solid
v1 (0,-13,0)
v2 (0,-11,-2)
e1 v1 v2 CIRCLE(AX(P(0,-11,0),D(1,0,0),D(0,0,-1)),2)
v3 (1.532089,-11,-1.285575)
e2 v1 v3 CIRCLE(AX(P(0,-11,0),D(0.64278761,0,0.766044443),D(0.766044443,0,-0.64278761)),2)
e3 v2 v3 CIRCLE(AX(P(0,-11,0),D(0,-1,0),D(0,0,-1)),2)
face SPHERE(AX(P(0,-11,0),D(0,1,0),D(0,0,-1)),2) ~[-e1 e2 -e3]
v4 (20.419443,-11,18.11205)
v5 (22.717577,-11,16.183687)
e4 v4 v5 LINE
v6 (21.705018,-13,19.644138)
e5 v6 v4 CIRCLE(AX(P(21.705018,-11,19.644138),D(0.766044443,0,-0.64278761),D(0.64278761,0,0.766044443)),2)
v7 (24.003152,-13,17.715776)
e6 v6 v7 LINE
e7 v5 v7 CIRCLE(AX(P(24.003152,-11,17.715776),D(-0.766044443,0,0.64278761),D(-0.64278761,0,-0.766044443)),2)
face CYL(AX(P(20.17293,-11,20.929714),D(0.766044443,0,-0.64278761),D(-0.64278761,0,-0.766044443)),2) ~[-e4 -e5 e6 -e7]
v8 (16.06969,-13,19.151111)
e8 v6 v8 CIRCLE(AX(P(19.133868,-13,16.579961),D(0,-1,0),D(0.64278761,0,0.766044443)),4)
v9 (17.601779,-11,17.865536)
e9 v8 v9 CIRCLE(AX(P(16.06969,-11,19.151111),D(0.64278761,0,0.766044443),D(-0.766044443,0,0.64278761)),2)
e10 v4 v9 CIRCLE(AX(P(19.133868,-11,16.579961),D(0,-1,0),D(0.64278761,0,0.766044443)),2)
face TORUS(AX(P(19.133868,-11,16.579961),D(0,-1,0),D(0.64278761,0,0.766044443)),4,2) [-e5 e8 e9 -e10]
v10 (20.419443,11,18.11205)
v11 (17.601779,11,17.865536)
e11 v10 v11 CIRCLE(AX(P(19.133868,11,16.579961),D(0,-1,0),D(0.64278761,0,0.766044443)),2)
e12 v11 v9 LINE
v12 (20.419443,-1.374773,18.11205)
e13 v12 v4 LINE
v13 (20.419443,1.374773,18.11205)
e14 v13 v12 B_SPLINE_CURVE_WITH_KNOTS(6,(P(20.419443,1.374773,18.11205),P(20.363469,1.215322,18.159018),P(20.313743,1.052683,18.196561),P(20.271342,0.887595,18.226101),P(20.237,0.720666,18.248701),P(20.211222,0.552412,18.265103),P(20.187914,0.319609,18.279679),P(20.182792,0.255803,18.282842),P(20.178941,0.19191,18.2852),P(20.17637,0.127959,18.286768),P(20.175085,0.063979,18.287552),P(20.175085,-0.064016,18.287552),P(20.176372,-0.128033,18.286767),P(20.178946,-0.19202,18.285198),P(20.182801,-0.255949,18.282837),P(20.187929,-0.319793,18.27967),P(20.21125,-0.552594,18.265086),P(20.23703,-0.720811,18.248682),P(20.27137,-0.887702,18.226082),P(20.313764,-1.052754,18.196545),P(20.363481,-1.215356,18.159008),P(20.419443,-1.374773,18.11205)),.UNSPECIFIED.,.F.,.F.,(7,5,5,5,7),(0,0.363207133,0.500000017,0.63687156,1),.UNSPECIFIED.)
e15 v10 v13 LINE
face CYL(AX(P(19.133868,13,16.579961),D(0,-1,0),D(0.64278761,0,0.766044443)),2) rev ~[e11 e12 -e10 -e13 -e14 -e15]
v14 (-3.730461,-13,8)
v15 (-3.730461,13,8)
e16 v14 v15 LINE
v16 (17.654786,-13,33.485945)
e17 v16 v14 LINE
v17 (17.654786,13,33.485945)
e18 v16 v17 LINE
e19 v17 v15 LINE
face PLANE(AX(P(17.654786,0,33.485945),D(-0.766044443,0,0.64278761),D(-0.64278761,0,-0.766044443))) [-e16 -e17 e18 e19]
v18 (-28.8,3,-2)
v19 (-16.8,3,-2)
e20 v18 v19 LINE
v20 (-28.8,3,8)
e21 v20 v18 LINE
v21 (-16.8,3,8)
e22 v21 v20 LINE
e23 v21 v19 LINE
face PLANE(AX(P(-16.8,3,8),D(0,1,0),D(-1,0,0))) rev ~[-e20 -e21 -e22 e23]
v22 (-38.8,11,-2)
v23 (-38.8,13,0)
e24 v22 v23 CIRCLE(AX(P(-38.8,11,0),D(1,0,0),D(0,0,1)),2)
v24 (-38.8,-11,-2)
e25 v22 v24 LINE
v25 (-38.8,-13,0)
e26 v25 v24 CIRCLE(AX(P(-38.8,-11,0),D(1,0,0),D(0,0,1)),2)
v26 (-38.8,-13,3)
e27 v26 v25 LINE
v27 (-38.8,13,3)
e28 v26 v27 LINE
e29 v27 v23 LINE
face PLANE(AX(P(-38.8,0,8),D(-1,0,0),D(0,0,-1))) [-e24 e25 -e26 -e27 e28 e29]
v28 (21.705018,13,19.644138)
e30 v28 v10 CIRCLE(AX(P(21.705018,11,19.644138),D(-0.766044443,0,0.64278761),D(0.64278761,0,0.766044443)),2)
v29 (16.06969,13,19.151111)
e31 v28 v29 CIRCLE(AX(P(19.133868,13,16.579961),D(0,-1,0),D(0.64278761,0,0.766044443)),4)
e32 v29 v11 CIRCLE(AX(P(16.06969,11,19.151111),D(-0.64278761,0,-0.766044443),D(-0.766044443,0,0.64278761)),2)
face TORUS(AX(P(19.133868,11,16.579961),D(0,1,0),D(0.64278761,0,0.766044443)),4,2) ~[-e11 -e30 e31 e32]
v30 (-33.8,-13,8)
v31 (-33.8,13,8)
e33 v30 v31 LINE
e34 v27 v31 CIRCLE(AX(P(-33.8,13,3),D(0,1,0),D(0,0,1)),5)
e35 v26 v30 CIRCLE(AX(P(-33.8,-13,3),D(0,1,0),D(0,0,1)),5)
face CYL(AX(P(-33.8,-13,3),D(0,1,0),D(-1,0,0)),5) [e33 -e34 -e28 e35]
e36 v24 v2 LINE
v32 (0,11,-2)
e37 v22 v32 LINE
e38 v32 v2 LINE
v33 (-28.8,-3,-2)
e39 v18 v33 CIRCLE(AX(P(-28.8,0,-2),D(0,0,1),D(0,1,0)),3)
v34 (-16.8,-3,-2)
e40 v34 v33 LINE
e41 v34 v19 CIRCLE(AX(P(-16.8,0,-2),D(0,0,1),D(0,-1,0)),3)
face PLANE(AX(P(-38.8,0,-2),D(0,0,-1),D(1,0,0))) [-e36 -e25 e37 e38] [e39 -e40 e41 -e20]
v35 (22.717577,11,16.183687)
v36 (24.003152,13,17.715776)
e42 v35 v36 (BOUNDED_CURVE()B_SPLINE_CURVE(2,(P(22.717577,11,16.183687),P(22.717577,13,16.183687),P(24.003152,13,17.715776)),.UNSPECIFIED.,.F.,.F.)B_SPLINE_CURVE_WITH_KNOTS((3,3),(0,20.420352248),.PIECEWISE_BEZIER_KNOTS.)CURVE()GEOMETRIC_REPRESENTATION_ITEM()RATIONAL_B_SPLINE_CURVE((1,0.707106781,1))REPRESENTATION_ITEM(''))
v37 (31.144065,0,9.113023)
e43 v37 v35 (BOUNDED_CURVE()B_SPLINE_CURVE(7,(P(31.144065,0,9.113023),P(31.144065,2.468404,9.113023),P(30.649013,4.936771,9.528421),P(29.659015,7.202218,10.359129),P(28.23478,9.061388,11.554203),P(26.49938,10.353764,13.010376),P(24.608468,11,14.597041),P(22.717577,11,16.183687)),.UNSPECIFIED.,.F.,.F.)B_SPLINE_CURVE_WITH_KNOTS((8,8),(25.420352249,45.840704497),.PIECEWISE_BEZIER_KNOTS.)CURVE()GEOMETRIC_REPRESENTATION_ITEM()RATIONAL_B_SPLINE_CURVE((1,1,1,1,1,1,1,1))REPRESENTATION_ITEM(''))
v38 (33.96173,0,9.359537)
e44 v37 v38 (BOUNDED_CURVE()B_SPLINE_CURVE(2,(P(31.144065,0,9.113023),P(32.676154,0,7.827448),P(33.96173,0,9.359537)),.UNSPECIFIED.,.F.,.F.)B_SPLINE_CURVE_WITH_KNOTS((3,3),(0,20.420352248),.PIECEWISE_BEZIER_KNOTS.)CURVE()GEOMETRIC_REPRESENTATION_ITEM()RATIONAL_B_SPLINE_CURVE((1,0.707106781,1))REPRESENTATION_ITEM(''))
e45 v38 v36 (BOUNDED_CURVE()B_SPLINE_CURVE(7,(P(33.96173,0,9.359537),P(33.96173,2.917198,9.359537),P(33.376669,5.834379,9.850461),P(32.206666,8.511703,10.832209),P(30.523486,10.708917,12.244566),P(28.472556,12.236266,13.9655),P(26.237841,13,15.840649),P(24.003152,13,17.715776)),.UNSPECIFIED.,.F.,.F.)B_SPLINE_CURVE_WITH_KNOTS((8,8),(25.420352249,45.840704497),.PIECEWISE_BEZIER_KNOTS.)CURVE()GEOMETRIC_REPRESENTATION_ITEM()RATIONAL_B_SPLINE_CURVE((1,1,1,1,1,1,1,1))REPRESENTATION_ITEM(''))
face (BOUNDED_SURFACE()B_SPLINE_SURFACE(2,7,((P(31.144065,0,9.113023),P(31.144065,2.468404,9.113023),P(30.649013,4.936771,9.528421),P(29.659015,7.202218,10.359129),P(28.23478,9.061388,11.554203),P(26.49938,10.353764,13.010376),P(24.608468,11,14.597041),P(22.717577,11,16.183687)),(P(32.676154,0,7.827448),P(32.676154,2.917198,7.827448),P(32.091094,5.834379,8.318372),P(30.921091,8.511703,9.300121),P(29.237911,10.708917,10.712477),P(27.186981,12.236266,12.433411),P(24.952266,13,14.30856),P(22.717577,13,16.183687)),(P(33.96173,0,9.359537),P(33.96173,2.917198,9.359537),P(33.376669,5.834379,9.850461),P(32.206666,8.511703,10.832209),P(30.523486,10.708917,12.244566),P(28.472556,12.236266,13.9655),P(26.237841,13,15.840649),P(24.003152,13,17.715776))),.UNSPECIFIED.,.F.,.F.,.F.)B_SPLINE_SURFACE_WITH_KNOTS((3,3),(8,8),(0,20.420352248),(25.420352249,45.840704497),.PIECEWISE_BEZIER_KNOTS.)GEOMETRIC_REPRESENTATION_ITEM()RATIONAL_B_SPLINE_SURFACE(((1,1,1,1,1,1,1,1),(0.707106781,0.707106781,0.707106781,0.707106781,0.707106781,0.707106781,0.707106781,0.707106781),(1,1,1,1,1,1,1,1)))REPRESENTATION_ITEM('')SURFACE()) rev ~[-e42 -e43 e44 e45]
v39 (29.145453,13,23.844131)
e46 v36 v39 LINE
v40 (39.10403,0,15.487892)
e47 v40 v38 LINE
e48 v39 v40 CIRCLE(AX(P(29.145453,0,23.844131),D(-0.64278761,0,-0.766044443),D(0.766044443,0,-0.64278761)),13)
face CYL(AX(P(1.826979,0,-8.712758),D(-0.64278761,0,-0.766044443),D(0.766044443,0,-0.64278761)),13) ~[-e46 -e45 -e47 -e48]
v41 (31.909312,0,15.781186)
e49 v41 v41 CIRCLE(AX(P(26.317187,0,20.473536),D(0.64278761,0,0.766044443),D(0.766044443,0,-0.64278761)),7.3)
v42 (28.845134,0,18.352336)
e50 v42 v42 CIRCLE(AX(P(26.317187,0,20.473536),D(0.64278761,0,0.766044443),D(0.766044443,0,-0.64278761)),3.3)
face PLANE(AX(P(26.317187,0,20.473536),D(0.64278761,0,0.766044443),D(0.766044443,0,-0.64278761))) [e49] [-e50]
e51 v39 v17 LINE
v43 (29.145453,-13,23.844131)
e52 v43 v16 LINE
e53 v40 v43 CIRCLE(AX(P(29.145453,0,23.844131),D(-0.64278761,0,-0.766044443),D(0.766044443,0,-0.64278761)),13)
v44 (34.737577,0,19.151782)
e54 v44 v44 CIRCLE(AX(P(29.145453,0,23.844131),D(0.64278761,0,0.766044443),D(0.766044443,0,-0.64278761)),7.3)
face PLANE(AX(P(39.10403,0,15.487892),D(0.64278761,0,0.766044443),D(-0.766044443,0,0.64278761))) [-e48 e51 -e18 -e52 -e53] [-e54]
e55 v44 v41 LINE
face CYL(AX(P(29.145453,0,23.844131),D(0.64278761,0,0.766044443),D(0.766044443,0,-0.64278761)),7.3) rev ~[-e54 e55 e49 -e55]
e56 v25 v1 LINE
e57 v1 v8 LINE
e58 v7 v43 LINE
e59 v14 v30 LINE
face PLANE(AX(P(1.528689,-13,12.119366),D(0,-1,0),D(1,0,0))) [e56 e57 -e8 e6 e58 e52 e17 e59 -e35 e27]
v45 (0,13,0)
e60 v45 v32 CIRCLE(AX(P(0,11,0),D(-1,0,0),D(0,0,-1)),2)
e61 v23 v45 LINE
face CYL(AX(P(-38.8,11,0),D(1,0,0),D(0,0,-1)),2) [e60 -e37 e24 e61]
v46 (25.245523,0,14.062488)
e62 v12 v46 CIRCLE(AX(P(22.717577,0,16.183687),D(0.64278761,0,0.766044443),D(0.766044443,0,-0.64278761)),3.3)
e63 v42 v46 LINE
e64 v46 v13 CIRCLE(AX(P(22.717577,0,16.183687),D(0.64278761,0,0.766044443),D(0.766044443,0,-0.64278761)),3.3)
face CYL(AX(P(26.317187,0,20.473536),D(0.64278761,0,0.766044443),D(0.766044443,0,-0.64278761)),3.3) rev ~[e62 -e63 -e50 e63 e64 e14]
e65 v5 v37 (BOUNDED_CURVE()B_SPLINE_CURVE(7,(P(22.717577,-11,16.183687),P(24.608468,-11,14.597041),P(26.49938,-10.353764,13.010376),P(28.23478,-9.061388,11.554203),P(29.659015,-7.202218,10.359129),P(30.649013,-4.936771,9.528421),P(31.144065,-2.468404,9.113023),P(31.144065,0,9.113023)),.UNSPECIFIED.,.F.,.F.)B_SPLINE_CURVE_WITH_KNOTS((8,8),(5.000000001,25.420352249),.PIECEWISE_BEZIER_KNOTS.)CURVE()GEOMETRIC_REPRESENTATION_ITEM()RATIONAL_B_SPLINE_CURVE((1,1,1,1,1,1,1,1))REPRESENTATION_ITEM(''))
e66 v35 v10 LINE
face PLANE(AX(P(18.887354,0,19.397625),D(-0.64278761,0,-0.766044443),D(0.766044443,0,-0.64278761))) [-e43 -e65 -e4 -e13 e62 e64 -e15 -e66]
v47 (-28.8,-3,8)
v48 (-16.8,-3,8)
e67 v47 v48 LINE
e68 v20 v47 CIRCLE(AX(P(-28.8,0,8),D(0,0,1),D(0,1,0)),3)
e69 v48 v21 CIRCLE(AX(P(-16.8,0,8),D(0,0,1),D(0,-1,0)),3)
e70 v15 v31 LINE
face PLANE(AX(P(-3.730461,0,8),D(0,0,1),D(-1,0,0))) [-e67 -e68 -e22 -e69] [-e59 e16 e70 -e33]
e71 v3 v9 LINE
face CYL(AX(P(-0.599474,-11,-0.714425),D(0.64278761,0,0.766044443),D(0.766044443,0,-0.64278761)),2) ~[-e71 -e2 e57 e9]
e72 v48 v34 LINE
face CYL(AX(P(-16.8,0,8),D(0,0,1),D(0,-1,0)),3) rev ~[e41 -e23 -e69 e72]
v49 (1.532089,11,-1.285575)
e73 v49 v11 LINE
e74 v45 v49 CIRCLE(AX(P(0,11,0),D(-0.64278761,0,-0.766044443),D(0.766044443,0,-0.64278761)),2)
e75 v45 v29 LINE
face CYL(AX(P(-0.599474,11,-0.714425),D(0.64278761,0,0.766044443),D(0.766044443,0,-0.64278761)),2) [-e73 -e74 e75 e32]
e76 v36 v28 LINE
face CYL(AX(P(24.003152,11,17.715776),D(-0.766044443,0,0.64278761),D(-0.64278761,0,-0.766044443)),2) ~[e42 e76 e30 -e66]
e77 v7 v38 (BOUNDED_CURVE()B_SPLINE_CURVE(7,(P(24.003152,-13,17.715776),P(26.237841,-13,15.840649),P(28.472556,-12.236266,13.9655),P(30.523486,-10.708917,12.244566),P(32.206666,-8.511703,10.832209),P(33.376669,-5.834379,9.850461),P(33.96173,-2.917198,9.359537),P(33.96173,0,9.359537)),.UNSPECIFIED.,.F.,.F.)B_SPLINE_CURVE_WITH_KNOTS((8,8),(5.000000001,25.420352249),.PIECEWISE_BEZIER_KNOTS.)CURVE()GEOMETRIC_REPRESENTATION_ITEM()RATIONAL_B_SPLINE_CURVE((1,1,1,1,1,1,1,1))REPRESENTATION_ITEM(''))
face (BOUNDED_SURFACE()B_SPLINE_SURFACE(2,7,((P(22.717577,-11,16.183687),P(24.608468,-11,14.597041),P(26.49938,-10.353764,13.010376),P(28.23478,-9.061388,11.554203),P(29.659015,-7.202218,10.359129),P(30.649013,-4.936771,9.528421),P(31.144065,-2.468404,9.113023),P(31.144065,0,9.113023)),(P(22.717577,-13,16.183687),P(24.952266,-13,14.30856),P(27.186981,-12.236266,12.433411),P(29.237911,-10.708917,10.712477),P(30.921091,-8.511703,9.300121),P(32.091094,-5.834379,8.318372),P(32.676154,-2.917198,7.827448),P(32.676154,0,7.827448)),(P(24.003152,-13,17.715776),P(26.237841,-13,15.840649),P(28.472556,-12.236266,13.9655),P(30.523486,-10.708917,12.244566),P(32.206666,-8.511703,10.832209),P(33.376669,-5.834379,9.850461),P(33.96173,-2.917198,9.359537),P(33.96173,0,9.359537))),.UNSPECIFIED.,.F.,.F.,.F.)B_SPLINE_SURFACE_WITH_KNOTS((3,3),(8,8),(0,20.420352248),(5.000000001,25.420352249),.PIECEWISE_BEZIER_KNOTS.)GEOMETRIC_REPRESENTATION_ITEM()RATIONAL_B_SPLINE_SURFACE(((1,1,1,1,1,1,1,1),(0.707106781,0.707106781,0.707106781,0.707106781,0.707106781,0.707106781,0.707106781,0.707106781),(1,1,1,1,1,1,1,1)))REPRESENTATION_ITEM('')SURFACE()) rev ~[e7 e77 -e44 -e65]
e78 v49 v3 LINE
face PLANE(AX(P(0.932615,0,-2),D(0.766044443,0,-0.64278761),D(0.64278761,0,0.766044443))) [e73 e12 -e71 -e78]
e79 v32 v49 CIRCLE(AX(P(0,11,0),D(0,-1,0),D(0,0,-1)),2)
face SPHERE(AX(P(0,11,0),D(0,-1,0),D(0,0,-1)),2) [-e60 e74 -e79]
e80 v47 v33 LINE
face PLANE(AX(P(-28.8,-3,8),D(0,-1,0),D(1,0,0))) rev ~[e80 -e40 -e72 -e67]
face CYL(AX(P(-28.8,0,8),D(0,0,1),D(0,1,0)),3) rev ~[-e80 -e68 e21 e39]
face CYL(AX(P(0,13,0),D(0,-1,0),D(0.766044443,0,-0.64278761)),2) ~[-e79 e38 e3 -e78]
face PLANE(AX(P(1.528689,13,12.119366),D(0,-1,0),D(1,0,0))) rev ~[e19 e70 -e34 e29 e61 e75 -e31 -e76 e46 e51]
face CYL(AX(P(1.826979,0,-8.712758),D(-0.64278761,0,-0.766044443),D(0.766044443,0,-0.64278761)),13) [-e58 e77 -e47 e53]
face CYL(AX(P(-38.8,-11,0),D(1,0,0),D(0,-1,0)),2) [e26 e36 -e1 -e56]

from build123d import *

# Parameters (mm, degrees)
F1_DEPTH    = 13
F2_T1_DEPTH = 75
F3_R        = 2
F4_R        = 7.3
F5_DEPTH    = 4.4
F6_R        = 3.3
F7_DEPTH    = 59.0732481421
F9_DEPTH    = 10.001
F10_R       = 5


# Not quite as in the source:
# - a fillet or chamfer that OpenCascade refuses, or shapes differently, is made with other operations: its cross-section is extruded or revolved along the edge and cut away or added


with BuildPart() as f1:
    # F0 (on Front) → F1 (new body, symmetric)
    with BuildSketch(Plane.XZ):
        Polygon((-38.8, 8), (-38.8, 0), (0, 0), (18.6408406809, 22.2152888505), (33.9617295433, 9.3595366567), (39.1040304208, 15.4878922017), (17.6547860135, 33.4859452729), (-3.7304612652, 8), align=None)
        Polygon((0, 0), (-38.8, 0), (-38.8, -2), (0.9326153163, -2), (18.8873543478, 19.3976247448), (32.6761543239, 7.8274477705), (33.9617295433, 9.3595366567), (18.6408406809, 22.2152888505), align=None)
    extrude(amount=F1_DEPTH, both=True)

    # F2: fillet of radius 13 on 2 edges, made by hand

    # F2_s2 → F2_t1 (cut)
    with BuildSketch(Plane(origin=(-3.5353318533, 0, -4.2132444372), x_dir=(0, 1, 0), z_dir=(0.6427876097, 0, 0.7660444431))):
        with BuildLine():
            ThreePointArc((0, -20), (-9.1923881554, -16.1923881554), (-13, -7))
            Line((-13, -7), (-13, -20))
            Line((-13, -20), (0, -20))
        make_face()
        with BuildLine():
            ThreePointArc((0, -20), (9.1923881554, -16.1923881554), (13, -7))
            Line((13, -7), (13, -20))
            Line((13, -20), (0, -20))
        make_face()
    extrude(amount=F2_T1_DEPTH, mode=Mode.SUBTRACT)

    # F3
    f3_edges = [f1.edges().sort_by_distance(p)[0] for p in [
        (18.887354, 0, 19.397625),
        (20.802465, -13, 17.790656),
        (29.759354, -9.192388, 10.274933),
        (29.759354, 9.192388, 10.274933),
        (20.802465, 13, 17.790656),
        (0.932615, 0, -2),
        (-18.933692, -13, -2),
        (-18.933692, 13, -2),
        (9.909985, 13, 8.698812),
        (9.909985, -13, 8.698812),
    ]]
    fillet(f3_edges, radius=F3_R)

    # F4 (on face) → F5 (cut)
    with BuildSketch(Plane(origin=(23.7831415584, 0, 28.3436443954), x_dir=(0.7660444431, 0, -0.6427876097), z_dir=(0.6427876097, 0, 0.7660444431))):
        with Locations((7, 0)):
            Circle(F4_R)
    extrude(amount=-F5_DEPTH, mode=Mode.SUBTRACT)

    # F6 (on face) → F7 (cut, through all)
    with BuildSketch(Plane(origin=(20.9548760758, 0, 24.9730488457), x_dir=(0.7660444431, 0, -0.6427876097), z_dir=(0.6427876097, 0, 0.7660444431))):
        with Locations((7, 0)):
            Circle(F6_R)
    extrude(amount=-F7_DEPTH, mode=Mode.SUBTRACT)

    # F8 (on face) → F9 (cut, through all)
    with BuildSketch(Plane.XY.offset(8)):
        with BuildLine():
            ThreePointArc((-28.8, 3), (-31.8, 0), (-28.8, -3))
            Line((-28.8, -3), (-16.8, -3))
            ThreePointArc((-16.8, -3), (-13.8, 0), (-16.8, 3))
            Line((-16.8, 3), (-28.8, 3))
        make_face()
    extrude(amount=-F9_DEPTH, mode=Mode.SUBTRACT)

    # F10
    f10_edges = [f1.edges().sort_by_distance(p)[0] for p in [
        (-38.8, 0, 8),
    ]]
    fillet(f10_edges, radius=F10_R)


solid = f1.part
